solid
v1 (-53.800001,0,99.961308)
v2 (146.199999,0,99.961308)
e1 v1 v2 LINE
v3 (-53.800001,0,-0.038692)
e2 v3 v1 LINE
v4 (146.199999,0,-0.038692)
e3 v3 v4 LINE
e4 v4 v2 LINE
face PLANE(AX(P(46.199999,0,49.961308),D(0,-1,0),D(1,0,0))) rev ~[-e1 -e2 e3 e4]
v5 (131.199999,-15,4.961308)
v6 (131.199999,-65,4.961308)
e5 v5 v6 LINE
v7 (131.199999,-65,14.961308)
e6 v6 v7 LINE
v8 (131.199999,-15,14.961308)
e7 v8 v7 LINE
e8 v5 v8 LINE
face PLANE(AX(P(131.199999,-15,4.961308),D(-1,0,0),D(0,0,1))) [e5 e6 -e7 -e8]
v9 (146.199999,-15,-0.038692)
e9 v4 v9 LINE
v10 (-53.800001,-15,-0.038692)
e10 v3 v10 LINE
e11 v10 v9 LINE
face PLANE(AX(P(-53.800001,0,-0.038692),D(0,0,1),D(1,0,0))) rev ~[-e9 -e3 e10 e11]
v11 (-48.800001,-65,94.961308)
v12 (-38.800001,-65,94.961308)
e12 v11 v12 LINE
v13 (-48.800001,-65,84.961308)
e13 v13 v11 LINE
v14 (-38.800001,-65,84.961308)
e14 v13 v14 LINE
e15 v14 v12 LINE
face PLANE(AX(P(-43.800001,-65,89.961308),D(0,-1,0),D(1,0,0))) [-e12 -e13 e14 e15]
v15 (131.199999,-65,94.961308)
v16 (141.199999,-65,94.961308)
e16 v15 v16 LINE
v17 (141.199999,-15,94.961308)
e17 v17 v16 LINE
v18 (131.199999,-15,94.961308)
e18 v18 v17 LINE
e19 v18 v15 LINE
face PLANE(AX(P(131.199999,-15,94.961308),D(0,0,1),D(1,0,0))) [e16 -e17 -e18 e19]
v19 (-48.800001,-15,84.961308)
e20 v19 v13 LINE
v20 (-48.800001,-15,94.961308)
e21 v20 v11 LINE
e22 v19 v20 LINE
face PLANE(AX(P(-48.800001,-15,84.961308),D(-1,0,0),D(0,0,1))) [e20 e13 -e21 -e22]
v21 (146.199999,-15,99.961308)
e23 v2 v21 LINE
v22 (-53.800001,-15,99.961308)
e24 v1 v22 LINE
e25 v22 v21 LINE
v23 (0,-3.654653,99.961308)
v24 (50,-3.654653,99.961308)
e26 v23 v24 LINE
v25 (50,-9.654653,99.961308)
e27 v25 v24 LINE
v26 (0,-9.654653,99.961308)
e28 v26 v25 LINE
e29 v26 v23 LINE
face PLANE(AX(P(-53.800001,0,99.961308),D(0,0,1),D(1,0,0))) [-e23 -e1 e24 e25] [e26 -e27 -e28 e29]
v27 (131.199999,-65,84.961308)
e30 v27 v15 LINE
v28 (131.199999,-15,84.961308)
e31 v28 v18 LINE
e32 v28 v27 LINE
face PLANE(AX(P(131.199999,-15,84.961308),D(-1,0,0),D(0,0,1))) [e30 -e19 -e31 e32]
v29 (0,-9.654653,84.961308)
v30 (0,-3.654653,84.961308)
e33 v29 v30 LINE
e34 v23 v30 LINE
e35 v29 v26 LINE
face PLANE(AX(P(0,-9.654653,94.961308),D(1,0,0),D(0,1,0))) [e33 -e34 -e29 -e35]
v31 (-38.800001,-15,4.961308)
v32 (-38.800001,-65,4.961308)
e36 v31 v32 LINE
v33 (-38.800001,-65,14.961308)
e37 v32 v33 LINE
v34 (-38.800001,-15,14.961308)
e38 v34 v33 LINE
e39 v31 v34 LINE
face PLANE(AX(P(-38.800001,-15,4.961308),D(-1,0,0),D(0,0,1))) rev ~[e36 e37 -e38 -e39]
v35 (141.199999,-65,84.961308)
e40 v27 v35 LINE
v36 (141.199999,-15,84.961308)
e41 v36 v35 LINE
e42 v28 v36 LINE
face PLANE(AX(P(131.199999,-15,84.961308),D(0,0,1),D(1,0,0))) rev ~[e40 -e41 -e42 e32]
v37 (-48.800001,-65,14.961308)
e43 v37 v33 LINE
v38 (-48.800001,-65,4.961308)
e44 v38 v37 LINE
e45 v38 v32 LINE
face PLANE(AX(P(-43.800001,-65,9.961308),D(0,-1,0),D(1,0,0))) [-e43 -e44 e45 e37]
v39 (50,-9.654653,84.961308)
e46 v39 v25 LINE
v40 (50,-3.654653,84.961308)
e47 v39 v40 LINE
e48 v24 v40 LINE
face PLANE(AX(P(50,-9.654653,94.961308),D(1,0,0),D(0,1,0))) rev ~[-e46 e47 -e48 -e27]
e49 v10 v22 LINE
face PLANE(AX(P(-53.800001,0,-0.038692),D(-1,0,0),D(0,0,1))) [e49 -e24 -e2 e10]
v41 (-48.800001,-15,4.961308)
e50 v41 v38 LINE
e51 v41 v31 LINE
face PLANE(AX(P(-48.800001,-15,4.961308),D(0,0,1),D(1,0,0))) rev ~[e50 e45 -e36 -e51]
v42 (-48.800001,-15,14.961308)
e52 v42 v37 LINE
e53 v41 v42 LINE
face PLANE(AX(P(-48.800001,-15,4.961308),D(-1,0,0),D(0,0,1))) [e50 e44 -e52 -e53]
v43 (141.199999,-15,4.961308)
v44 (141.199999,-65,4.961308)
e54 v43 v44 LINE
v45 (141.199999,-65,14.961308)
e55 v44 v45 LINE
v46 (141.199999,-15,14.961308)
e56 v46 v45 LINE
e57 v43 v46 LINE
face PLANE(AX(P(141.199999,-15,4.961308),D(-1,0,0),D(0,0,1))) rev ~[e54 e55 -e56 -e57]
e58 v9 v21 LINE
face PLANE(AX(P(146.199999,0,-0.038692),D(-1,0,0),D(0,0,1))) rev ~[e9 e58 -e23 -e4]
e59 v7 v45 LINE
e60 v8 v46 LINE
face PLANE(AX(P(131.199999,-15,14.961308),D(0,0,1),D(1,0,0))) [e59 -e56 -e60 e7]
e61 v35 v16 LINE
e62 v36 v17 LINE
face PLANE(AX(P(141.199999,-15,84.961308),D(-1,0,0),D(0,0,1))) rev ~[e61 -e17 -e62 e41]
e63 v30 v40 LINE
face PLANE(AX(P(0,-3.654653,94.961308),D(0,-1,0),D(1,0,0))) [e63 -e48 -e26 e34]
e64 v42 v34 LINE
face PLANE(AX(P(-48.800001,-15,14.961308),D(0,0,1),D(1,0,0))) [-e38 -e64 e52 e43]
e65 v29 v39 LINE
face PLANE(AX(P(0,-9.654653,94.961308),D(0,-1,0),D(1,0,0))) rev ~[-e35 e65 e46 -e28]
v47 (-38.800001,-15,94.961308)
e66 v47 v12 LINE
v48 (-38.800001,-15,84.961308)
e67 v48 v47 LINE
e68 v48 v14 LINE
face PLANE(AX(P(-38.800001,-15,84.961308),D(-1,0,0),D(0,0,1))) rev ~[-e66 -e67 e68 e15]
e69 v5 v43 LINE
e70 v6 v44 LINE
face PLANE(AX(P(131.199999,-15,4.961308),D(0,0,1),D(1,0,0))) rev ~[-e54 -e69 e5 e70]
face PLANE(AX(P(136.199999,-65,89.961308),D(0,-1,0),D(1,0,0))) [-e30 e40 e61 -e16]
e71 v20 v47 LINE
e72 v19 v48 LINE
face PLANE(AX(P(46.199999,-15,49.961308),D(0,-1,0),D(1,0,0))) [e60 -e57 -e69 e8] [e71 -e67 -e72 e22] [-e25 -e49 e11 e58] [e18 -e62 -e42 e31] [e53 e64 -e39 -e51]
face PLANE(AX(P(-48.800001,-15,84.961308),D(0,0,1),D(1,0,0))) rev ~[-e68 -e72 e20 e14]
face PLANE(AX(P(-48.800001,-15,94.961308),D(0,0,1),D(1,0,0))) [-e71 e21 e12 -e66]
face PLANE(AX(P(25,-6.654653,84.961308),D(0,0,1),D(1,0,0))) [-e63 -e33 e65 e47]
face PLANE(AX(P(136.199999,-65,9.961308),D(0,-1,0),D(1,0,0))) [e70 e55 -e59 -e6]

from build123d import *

# Parameters (mm, degrees)
F0_W     = 200
F0_H     = 100
F1_DEPTH = 15
F2_W     = 10
F2_H     = 10
F3_DEPTH = 50
F4_W     = 50
F4_H     = 6
F5_DEPTH = 10


# Not quite as in the source:
# - a feature names something its author has since deleted; it is built from what else it names


with BuildPart() as f1:
    # F0 (on Front) → F1 (new body)
    with BuildSketch(Plane.XZ):
        with Locations((46.1999992281, 49.9613083565)):
            Rectangle(F0_W, F0_H)
    extrude(amount=F1_DEPTH)

    # F2 (on face) → F3 (join)
    with BuildSketch(Plane.XZ.offset(15)):
        with Locations((-43.8000007719, 89.9613083565)):
            Rectangle(F2_W, F2_H)
        with Locations((-43.8000007719, 9.9613083565)):
            Rectangle(F2_W, F2_H)
        with Locations((136.1999992281, 89.9613083565)):
            Rectangle(F2_W, F2_H)
        with Locations((136.1999992281, 9.9613083565)):
            Rectangle(F2_W, F2_H)
    extrude(amount=F3_DEPTH)

    # F4 (on face) → F5 (cut, symmetric)
    with BuildSketch(Plane.XY.offset(94.9613083565)):
        with Locations((25, -6.6546534393)):
            Rectangle(F4_W, F4_H)
    extrude(amount=F5_DEPTH, both=True, mode=Mode.SUBTRACT)


solid = f1.part
